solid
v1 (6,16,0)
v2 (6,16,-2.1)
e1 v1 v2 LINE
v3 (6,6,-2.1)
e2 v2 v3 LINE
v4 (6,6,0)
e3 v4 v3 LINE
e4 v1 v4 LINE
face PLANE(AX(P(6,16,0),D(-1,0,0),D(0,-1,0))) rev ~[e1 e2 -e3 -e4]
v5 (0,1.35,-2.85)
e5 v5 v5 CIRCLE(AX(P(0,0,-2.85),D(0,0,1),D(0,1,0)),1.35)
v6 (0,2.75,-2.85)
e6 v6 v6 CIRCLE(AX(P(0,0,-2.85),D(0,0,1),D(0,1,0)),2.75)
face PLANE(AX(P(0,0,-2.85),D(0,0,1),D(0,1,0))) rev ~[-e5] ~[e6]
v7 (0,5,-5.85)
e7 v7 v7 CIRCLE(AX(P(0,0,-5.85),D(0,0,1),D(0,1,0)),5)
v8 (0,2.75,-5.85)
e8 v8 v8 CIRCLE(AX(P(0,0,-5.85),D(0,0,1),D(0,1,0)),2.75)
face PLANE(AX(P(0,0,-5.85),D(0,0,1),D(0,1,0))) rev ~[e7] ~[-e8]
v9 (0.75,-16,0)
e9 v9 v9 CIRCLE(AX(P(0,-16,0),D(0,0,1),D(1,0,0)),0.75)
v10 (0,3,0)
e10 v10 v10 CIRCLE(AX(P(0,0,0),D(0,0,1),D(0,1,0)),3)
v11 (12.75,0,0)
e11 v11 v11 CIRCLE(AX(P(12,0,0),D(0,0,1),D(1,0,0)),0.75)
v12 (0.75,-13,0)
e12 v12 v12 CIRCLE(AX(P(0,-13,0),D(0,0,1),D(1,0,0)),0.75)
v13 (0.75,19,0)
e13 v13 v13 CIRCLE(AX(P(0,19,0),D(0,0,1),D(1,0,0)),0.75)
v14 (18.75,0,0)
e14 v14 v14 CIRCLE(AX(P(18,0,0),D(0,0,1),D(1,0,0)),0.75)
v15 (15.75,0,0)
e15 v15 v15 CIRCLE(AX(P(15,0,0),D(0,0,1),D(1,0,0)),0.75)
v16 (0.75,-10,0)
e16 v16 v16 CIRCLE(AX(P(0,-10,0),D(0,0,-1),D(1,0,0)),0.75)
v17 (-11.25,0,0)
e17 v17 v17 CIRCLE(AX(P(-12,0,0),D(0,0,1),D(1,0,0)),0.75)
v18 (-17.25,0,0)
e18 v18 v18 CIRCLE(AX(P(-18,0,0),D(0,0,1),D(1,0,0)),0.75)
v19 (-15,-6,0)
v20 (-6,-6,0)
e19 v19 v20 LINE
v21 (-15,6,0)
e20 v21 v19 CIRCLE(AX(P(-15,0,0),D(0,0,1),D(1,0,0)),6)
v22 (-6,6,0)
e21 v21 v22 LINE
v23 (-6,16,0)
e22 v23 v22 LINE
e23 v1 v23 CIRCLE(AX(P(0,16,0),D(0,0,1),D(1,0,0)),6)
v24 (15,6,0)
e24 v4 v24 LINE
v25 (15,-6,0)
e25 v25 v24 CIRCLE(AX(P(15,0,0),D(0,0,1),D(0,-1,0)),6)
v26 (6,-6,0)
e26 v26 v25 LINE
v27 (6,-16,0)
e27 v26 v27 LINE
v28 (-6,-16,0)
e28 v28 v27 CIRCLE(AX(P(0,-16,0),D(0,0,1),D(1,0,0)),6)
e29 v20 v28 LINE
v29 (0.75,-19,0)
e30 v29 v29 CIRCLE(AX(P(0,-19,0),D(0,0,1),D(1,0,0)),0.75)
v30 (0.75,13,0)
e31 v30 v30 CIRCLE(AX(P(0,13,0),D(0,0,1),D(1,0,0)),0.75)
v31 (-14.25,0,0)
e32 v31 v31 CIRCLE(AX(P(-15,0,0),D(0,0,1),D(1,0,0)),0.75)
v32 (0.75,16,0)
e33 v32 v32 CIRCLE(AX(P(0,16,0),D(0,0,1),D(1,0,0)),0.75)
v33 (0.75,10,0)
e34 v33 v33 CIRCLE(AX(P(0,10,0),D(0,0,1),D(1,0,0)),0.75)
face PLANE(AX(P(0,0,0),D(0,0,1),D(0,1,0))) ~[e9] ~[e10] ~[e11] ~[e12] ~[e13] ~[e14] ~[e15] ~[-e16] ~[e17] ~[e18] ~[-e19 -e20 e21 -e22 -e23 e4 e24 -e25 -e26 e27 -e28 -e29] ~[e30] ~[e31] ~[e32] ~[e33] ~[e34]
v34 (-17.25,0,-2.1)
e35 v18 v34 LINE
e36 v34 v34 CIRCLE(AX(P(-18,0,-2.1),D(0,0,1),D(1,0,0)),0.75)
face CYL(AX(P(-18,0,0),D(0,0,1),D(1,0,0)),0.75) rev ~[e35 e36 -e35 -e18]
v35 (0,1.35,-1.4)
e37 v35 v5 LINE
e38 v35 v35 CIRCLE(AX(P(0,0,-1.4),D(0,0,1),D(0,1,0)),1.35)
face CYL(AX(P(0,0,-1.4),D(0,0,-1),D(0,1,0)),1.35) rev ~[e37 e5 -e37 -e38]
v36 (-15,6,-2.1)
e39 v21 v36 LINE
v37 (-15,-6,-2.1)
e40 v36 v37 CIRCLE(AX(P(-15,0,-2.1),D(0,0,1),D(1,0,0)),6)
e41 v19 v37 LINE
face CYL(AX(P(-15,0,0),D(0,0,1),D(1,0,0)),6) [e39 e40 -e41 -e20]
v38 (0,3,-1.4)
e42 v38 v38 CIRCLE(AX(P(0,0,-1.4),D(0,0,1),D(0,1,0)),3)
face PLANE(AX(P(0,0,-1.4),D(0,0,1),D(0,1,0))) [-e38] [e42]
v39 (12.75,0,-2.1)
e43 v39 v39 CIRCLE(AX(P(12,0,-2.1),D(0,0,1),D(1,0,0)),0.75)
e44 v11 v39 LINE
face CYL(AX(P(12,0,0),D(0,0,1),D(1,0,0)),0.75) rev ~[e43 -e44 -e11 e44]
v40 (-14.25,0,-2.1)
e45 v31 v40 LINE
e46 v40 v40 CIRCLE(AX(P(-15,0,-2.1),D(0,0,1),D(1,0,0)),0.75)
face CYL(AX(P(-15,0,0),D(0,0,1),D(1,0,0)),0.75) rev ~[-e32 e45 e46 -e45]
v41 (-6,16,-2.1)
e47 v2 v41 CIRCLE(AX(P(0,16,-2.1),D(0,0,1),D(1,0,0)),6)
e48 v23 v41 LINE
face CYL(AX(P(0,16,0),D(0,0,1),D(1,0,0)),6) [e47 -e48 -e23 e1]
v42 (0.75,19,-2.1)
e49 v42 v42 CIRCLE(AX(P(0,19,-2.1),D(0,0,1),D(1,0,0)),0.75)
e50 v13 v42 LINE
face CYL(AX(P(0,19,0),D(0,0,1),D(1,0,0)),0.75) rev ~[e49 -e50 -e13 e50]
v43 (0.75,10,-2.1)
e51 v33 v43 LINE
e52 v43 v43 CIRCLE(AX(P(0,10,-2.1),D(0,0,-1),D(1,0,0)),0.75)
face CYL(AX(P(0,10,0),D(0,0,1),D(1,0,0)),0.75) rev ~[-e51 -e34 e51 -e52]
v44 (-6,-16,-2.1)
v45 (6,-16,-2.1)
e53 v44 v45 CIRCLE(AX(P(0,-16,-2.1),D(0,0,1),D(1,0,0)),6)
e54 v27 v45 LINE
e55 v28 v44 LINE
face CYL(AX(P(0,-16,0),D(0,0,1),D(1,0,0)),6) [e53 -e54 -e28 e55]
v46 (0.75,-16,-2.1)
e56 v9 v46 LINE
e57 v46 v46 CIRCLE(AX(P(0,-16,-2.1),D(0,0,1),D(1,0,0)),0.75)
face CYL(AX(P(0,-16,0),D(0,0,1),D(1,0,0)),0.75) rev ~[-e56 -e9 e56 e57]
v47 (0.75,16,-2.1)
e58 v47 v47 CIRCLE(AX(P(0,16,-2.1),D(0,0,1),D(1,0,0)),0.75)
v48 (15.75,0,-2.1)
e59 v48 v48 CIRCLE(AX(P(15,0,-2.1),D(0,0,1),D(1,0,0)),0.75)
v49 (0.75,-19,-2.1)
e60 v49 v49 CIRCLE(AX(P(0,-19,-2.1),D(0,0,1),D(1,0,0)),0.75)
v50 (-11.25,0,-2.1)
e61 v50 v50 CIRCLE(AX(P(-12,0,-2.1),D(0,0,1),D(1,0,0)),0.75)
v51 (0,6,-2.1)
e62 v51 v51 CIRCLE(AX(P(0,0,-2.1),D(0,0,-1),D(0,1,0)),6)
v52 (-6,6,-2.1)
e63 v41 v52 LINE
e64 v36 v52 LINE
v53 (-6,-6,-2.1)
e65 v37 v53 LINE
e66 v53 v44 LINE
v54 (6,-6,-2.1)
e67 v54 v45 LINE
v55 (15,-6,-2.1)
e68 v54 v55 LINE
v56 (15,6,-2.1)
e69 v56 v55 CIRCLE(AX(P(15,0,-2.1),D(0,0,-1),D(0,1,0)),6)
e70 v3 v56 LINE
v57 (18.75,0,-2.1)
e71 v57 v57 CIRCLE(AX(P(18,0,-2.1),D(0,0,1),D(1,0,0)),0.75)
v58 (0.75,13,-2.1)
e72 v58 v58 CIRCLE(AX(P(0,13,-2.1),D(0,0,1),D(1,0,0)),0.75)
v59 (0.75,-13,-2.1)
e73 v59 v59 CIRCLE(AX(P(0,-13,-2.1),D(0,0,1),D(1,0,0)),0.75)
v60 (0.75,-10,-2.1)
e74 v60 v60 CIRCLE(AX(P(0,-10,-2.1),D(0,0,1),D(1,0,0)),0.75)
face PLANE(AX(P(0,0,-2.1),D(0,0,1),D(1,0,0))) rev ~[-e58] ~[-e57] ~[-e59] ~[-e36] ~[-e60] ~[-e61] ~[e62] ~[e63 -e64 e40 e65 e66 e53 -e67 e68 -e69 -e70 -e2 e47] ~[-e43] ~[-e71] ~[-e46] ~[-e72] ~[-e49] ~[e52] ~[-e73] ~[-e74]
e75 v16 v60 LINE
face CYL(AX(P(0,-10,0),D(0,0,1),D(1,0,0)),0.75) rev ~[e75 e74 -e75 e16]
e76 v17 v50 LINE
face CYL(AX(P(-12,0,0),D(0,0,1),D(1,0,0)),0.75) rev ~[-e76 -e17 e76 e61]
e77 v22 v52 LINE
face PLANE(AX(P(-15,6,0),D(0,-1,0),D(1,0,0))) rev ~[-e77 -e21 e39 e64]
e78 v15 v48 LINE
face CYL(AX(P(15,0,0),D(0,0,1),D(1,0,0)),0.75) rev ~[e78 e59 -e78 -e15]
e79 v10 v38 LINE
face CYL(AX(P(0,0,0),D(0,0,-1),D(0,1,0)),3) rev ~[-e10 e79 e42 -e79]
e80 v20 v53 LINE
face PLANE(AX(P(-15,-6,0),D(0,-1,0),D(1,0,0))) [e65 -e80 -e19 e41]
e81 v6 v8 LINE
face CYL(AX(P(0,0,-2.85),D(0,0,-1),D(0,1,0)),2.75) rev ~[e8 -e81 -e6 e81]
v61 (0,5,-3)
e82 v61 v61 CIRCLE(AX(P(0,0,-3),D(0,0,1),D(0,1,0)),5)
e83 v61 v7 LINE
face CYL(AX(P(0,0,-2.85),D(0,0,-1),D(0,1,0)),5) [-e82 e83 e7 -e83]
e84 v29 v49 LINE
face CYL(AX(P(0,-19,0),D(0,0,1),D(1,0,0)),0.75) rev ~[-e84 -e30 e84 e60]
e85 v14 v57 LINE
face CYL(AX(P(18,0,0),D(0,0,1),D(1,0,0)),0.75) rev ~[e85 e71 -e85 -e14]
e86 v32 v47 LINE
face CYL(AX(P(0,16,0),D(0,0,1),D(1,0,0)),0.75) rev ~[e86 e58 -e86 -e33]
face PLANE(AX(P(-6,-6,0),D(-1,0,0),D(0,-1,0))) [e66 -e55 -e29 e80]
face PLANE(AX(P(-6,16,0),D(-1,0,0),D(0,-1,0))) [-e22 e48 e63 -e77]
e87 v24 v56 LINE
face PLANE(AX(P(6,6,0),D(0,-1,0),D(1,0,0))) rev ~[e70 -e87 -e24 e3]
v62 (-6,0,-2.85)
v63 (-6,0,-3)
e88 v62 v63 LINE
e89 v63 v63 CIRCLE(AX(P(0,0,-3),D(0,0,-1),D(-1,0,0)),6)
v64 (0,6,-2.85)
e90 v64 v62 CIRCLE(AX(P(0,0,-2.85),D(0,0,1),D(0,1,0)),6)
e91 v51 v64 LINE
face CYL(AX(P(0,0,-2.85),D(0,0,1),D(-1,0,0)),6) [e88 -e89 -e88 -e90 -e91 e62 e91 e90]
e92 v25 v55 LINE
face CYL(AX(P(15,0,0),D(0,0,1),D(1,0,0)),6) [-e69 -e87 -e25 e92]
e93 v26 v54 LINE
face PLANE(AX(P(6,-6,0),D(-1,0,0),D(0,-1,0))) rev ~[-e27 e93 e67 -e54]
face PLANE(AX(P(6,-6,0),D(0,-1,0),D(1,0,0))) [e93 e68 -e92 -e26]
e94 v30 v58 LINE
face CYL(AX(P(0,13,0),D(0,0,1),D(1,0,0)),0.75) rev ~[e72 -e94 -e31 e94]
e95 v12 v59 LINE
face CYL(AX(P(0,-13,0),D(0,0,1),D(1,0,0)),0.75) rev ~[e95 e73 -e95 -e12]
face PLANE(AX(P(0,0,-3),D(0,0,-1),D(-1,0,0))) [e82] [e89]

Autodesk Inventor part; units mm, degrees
ref_plane "YZ Plane" through (0, 0, 0) normal (1, 0, 0) x (0, 1, 0)
ref_plane "XZ Plane" through (0, 0, 0) normal (0, 1, 0) x (-1, 0, 0)
ref_plane "XY Plane" through (0, 0, 0) normal (0, 0, 1) x (1, 0, 0)
sketch "Sketch1" plane through (0, 0, 0) normal (1, 0, 0) x (0, 1, 0)
  line L0 (0, 0) -> (6, 0)
  line L1 (6, 0) -> (6, -2.85)
  line L2 (6, -2.85) -> (0, -2.85)
  line L3 (0, -2.85) -> (0, 0)
  line L4 (0, 0) -> (3, 0)
  line L5 (3, 0) -> (3, -1.4)
  line L6 (3, -1.4) -> (0, -1.4)
  line L7 (0, -1.4) -> (0, 0)
  line L8 (0, -1.4) -> (1.35, -1.4)
  line L9 (1.35, -1.4) -> (1.35, -2.85)
  line L10 (1.35, -2.85) -> (0, -2.85)
  line L11 (0, -2.85) -> (0, -1.4)
  line L12 (0, -2.85) -> (5, -2.85)
  line L13 (5, -2.85) -> (5, -5.85)
  line L14 (5, -5.85) -> (0, -5.85)
  line L15 (0, -5.85) -> (0, -2.85)
  line L16 (0, -2.85) -> (2.75, -2.85)
  line L17 (2.75, -2.85) -> (2.75, -5.85)
  line L18 (2.75, -5.85) -> (0, -5.85)
  line L19 (0, -5.85) -> (0, -2.85)
  point P0 (1.5, 0)
  point P1 (1.5, -1.4)
  dimension "d0" = 6
  dimension "d1" = 2.85
  dimension "d2" = 3
  dimension "d3" = 1.4
  dimension "d4" = 1.35
  dimension "d5" = 1.45
  dimension "d6" = 5
  dimension "d7" = 3
  dimension "d8" = 2.75
  dimension "d9" = 3
revolve "Revolution1" add sketch "Sketch1" angle 360 about axis through (0, 0, -2.85) along (0, 0, 1) contours L0 L1 L2 L9 L6 L5 | L13 L14 L17 L2
sketch "Sketch2" plane through (0, 0, 0) normal (0, 0, 1) x (1, 0, 0)
  point P0 (0, 0)
sketch "Sketch3" plane through (0, 0, 0) normal (0, 0, 1) x (1, 0, 0)
  circle A0 centre (0, 16) radius 6
  circle A1 centre (-15, 0) radius 6
  circle A2 centre (0, -16) radius 6
  circle A3 centre (15, 0) radius 6
  line L0 (-6, 16) -> (-6, -16)
  line L1 (6, 16) -> (6, -16)
  line L2 (-15, 6) -> (15, 6)
  line L3 (-15, -6) -> (15, -6)
  circle A4 centre (0, 10) radius 0.75
  circle A5 centre (0, 13) radius 0.75
  circle A6 centre (0, 16) radius 0.75
  circle A7 centre (0, 19) radius 0.75
  circle A8 centre (0, -19) radius 0.75
  circle A9 centre (0, -16) radius 0.75
  circle A10 centre (0, -13) radius 0.75
  circle A11 centre (0, -10) radius 0.75
  circle A12 centre (-12, 0) radius 0.75
  circle A13 centre (-15, 0) radius 0.75
  circle A14 centre (-18, 0) radius 0.75
  circle A15 centre (12, 0) radius 0.75
  circle A16 centre (15, 0) radius 0.75
  circle A17 centre (18, 0) radius 0.75
  point P0 (0, 0)
  point P1 (-6, 6)
  point P2 (-6, -6)
  point P3 (6, -6)
  point P4 (6, 6)
  dimension "d11" = 12
  dimension "d12" = 16
  dimension "d13" = 12
  dimension "d14" = 15
  dimension "d15" = 12
  dimension "d16" = 16
  dimension "d17" = 12
  dimension "d18" = 15
  dimension "d19" = 1.5
  dimension "d20" = 1.5
  dimension "d21" = 1.5
  dimension "d22" = 1.5
  dimension "d23" = 10
  dimension "d24" = 13
  dimension "d25" = 16
  dimension "d26" = 19
  dimension "d27" = 1.5
  dimension "d28" = 1.5
  dimension "d29" = 1.5
  dimension "d30" = 1.5
  dimension "d31" = 10
  dimension "d32" = 13
  dimension "d33" = 16
  dimension "d34" = 19
  dimension "d35" = 1.5
  dimension "d36" = 1.5
  dimension "d37" = 1.5
  dimension "d38" = 12
  dimension "d39" = 15
  dimension "d40" = 18
  dimension "d41" = 1.5
  dimension "d42" = 1.5
  dimension "d43" = 1.5
  dimension "d44" = 18
  dimension "d45" = 15
  dimension "d46" = 12
extrude "Extrusion1" add sketch "Sketch3" against normal blind 2.1 contours A0 A4 | L1 L2 L0 A0 A4 | L2 A3 L3 L1 | L1 L3 L0 L2 | L0 L3 A1 L2 | L1 A2 A11 L0 L3 | A3 | A1 | A2 A11 picked at (-2.215, 14.0731) picked at (-2.215, -14.0731)
revolve "Revolution2" cut sketch "Sketch1" angle 360 about axis through (0, 0, -2.85) along (0, 0, 1) contours L0 L5 L6 L3 | L6 L9 L2 L3 | L2 L17 L14 L15
sketch "Sketch4" plane through (0, 0, -2.85) normal (0, 0, -1) x (-1, 0, 0)
  circle A0 centre (0, 0) radius 6
  circle A1 centre (0, 0) radius 1.35 projected
  circle A2 centre (0, 0) radius 5
extrude "Extrusion2" add sketch "Sketch4" along normal blind 0.15 contours A0
properties part number "Standar Servo Horn - Red"
